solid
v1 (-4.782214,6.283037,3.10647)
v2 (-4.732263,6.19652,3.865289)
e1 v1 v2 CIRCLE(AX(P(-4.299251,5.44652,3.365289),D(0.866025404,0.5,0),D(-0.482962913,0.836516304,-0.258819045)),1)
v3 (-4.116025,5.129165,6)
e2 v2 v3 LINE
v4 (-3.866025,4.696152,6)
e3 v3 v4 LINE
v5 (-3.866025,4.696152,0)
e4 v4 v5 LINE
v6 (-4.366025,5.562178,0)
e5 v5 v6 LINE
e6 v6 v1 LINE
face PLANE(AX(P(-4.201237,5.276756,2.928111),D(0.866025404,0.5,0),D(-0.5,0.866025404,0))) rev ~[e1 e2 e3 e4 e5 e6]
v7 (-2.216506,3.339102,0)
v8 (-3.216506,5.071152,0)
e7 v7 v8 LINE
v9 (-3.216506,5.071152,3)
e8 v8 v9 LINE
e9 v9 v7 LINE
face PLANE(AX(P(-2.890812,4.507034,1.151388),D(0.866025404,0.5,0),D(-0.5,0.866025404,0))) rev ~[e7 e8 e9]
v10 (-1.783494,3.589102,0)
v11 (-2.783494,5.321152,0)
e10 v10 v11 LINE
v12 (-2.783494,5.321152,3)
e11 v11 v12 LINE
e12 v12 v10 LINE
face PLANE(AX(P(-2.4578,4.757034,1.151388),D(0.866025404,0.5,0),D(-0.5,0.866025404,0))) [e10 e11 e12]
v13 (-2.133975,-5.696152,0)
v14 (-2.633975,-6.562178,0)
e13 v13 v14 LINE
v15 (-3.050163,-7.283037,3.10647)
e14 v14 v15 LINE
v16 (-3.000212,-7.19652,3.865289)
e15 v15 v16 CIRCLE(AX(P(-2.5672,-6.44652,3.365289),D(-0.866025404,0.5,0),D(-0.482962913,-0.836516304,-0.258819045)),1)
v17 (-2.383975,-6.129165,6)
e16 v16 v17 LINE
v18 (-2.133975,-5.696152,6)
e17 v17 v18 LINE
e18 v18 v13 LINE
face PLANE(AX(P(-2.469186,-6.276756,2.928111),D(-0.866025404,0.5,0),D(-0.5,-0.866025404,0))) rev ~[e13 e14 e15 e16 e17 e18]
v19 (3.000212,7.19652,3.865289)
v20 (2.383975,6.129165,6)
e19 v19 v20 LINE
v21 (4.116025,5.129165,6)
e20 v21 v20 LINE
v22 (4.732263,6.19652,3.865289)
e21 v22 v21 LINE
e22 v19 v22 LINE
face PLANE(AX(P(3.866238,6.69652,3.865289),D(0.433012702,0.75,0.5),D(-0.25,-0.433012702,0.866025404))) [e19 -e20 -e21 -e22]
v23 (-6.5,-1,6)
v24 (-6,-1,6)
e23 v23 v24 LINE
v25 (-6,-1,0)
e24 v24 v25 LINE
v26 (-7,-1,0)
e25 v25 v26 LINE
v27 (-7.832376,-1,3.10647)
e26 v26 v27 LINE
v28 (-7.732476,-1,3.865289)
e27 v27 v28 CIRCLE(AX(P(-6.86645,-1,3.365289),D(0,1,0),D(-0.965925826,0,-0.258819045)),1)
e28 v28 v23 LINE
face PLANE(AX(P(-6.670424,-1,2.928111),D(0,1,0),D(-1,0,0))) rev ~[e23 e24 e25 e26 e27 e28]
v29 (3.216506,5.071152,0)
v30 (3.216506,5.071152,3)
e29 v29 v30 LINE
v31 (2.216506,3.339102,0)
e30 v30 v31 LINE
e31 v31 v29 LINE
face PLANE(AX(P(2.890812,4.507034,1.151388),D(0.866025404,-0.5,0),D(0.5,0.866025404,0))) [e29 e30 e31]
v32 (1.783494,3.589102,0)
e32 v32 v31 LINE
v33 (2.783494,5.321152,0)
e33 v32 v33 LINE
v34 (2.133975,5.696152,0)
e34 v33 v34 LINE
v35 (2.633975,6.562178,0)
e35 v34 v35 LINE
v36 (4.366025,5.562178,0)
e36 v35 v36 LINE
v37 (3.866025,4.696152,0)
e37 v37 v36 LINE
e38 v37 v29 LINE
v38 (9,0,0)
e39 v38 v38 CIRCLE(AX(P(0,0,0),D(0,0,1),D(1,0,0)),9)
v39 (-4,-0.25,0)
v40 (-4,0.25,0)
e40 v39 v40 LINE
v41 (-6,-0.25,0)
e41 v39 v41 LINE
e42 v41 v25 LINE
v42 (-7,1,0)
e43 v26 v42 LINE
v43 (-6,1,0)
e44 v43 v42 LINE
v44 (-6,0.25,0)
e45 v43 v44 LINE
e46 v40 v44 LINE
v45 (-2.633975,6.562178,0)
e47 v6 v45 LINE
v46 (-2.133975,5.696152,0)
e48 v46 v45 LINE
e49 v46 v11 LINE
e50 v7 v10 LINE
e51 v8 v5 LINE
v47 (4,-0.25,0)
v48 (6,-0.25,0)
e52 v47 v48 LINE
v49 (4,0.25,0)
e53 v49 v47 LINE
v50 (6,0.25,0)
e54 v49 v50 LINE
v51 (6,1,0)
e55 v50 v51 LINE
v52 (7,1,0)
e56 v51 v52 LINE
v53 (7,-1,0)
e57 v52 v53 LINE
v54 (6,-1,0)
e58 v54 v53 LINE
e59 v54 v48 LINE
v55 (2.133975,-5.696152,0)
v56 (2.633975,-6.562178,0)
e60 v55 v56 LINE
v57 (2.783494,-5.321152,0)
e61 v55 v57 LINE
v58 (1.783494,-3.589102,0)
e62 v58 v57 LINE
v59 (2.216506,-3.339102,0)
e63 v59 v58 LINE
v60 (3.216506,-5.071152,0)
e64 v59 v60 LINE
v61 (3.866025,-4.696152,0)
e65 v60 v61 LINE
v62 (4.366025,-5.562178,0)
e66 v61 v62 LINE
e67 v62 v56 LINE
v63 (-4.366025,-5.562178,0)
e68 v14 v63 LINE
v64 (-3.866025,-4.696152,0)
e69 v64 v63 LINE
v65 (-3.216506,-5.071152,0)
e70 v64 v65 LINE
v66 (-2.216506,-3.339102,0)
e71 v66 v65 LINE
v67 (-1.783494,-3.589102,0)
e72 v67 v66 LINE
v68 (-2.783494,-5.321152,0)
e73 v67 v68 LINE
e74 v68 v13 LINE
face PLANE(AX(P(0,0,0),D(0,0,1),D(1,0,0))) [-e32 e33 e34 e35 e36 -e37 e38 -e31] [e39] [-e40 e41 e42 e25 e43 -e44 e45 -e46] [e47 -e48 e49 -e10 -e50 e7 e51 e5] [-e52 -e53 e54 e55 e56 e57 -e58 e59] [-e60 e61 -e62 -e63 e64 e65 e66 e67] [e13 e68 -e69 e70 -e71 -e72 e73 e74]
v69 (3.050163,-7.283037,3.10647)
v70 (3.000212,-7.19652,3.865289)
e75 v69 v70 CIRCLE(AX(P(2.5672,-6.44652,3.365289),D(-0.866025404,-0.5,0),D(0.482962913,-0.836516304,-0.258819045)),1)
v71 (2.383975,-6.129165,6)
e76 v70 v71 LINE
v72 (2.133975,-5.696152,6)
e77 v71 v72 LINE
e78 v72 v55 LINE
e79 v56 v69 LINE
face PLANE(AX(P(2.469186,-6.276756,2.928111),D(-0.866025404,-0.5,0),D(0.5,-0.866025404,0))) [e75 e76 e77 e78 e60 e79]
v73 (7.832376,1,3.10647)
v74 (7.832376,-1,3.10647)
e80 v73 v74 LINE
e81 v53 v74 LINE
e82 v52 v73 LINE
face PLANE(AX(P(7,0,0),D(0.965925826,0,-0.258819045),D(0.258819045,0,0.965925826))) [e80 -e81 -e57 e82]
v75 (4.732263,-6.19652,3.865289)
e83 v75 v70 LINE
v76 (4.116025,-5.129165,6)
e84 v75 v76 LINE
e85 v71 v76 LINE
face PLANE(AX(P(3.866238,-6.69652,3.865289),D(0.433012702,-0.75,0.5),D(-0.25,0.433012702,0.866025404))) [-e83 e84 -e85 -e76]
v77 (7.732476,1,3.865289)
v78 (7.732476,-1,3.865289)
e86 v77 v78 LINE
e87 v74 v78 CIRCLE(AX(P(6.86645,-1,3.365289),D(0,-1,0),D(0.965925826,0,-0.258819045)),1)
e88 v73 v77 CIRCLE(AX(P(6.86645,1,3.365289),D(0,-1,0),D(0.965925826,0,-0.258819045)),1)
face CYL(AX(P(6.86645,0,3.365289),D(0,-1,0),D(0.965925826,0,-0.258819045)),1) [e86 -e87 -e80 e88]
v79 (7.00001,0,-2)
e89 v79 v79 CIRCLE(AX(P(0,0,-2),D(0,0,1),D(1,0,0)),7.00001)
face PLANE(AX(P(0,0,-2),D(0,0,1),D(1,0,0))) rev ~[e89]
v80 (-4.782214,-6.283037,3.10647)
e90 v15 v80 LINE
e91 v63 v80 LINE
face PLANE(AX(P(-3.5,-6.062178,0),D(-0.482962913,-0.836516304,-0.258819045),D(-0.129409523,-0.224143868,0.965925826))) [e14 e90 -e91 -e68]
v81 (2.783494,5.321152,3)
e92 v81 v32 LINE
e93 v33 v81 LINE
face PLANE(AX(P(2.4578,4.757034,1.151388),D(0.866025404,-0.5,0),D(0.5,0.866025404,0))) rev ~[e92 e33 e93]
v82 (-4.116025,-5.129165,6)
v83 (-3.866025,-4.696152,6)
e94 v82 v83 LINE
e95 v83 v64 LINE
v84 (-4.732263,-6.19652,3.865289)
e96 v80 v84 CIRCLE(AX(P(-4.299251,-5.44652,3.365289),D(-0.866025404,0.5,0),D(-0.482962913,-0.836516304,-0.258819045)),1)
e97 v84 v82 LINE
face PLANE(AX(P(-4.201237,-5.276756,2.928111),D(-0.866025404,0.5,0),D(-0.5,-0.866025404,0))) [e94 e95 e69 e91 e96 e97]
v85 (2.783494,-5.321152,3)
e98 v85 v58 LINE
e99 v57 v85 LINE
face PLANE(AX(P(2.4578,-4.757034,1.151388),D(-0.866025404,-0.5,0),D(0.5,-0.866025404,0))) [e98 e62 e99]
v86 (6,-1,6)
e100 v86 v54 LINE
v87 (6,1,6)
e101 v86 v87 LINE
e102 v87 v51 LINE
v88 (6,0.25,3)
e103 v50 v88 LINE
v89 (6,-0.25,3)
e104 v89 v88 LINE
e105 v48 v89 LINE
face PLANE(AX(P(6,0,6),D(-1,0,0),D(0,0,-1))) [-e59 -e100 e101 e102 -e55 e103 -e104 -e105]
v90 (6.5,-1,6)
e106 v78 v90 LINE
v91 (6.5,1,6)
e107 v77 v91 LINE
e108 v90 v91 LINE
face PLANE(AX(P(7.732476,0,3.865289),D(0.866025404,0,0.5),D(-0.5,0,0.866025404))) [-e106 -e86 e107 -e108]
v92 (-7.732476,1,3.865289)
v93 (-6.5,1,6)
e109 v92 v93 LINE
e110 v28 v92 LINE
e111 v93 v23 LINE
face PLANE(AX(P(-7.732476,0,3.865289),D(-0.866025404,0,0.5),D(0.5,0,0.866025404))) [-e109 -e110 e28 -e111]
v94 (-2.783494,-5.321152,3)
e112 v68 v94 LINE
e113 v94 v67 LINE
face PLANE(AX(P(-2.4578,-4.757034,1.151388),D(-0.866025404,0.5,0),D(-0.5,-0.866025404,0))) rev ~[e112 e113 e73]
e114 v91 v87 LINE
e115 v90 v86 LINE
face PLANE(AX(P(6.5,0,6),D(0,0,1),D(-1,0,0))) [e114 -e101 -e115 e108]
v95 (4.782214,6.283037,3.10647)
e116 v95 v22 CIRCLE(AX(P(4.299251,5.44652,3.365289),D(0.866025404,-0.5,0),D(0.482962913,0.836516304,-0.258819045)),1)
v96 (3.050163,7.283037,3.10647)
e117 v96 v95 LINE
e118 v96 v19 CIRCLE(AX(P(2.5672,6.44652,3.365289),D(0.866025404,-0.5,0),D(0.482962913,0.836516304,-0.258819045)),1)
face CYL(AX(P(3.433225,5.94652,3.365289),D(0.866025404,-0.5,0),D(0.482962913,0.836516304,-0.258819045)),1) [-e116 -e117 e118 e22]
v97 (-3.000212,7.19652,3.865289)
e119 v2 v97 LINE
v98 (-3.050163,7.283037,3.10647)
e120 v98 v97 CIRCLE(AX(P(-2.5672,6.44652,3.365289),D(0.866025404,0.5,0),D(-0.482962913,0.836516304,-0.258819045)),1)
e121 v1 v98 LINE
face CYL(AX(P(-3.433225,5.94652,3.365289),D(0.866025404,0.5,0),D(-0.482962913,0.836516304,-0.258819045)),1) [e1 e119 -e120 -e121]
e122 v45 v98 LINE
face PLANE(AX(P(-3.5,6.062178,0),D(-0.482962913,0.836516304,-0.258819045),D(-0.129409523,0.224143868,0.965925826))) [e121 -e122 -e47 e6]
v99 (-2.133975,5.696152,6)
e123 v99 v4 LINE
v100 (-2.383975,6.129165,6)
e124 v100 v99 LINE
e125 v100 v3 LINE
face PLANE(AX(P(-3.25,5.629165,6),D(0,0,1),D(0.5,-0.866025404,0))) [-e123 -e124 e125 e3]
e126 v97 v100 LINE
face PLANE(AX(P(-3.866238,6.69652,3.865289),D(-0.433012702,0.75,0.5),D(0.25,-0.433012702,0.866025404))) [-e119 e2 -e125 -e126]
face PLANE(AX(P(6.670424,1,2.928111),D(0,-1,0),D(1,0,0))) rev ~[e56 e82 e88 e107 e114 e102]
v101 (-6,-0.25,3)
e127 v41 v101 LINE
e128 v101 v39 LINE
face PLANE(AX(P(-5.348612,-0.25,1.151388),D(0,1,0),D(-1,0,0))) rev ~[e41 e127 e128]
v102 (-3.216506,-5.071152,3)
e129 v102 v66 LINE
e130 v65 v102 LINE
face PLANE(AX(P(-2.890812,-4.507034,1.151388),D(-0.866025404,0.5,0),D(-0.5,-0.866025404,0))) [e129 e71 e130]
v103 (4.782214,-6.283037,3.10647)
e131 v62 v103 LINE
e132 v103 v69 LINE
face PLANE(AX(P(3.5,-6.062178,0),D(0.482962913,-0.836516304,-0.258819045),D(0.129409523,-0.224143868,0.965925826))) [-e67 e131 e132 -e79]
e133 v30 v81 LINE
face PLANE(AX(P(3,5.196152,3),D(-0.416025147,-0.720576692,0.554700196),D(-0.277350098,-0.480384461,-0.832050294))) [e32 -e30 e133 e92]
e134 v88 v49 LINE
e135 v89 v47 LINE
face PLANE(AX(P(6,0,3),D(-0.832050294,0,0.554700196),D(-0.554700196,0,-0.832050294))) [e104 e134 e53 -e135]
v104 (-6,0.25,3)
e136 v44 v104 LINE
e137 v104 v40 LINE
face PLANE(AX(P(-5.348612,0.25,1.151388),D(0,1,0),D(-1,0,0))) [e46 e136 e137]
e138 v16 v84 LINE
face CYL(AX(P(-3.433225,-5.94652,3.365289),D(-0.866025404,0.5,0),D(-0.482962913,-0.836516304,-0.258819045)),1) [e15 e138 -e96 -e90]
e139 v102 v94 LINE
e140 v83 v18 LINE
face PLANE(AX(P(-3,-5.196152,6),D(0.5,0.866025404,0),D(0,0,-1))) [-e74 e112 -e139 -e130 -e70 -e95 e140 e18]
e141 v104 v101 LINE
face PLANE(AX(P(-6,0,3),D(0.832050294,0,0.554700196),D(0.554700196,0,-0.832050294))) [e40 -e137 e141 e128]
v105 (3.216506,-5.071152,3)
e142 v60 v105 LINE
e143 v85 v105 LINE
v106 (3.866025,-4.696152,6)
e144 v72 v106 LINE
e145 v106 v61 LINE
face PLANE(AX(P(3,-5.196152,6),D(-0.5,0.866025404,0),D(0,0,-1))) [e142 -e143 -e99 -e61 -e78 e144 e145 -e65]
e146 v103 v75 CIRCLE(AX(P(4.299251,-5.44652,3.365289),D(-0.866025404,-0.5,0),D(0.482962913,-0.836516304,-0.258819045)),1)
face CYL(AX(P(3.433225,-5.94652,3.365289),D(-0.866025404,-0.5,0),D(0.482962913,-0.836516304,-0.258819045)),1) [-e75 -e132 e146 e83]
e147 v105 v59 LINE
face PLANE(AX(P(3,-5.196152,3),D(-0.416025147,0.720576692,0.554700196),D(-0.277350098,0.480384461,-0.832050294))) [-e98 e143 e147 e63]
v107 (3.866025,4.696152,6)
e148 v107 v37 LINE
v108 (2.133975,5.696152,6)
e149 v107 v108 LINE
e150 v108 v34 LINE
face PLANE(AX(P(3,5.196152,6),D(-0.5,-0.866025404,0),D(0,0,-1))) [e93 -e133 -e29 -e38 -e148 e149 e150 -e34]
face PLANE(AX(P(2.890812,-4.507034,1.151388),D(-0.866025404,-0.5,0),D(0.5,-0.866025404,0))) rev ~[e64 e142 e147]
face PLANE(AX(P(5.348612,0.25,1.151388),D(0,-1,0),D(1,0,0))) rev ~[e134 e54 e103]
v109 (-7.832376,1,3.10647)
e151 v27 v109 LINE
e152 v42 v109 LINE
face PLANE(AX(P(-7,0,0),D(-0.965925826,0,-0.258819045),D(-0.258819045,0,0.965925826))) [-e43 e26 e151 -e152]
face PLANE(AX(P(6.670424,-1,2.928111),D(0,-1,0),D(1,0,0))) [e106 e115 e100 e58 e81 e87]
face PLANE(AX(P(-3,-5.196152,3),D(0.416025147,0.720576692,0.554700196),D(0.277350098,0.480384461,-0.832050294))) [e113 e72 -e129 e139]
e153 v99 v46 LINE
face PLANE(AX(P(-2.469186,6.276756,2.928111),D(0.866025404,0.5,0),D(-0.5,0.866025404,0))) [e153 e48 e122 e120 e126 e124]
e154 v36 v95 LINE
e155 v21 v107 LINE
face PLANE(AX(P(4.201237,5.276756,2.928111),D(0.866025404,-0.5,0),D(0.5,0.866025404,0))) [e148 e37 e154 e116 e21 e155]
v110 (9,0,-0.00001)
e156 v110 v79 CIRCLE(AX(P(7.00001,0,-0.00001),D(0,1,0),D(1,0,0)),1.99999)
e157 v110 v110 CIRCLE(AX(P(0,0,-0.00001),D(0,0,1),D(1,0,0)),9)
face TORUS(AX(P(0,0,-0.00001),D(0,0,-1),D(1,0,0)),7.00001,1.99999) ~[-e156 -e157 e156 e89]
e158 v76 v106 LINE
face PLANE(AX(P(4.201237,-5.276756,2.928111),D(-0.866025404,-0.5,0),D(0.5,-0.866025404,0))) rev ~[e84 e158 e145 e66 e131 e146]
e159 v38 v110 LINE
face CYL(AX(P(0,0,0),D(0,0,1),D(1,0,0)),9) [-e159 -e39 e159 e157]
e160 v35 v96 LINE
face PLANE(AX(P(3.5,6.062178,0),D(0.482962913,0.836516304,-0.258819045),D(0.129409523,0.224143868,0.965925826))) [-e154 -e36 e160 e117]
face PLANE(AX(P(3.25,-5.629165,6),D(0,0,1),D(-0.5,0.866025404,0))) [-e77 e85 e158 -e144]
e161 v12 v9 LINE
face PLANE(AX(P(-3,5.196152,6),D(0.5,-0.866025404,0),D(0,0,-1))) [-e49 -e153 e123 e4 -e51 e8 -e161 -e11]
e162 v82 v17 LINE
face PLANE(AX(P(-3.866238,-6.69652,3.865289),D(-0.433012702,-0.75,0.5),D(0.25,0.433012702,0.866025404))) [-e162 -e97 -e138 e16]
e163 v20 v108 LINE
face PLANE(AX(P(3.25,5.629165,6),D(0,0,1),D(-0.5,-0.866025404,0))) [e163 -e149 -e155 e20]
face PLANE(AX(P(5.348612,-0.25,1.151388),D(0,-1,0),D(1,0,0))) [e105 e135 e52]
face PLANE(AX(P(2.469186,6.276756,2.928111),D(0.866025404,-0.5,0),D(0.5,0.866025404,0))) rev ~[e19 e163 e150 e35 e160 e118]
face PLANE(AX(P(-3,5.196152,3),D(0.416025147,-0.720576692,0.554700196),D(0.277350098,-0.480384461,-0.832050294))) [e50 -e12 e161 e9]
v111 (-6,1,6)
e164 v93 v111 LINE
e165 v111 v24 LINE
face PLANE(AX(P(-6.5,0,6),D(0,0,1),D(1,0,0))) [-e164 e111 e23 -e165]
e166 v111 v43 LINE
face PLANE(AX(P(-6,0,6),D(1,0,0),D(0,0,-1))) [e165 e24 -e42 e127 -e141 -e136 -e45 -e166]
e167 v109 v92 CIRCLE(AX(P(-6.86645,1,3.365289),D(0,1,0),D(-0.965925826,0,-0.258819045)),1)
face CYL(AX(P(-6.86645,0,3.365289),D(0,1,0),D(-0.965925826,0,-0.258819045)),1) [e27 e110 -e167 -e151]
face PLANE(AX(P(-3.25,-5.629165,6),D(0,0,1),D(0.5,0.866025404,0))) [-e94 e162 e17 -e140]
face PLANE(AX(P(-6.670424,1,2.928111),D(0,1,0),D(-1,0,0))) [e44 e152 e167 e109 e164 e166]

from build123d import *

# Parameters (mm, degrees)
F1_DEPTH        = 1
F1_COPIES_COUNT = 6
F2_DEPTH        = 0.25
F2_COPIES_COUNT = 6
F3_R            = 9
F4_DEPTH        = 2
F5_R            = 1.99999


# Not quite as in the source:
# - a fillet or chamfer is up to 0.001 mm smaller than in the source, because OpenCascade refuses the exact size
# - a pattern or mirror of a feature is missing from the dataset's text; its kind, count and spacing are read off the source's solid


with BuildPart() as f1:
    # F0 (on Front) → F1 (new body, symmetric)
    with BuildSketch(Plane.XZ):
        with BuildLine():
            Line((6, 3), (6, 0))
            Line((6, 0), (7, 0))
            Line((7, 0), (7.8323762036, 3.1064702829))
            ThreePointArc((7.8323762036, 3.1064702829), (7.8578952387, 3.4958155202), (7.7324757811, 3.865289328))
            Line((7.7324757811, 3.865289328), (6.5, 6))
            Line((6.5, 6), (6, 6))
            Line((6, 6), (6, 3))
        make_face()
    extrude(amount=F1_DEPTH, both=True)


with BuildPart() as f1_copies_1:
    # F1_copies: instance of F1
    add(f1.part.rotate(Axis((0, 0, 0), (0, 0, 1)), 1 * 360 / F1_COPIES_COUNT))


with BuildPart() as f1_copies_2:
    # F1_copies: instance of F1
    add(f1.part.rotate(Axis((0, 0, 0), (0, 0, 1)), 2 * 360 / F1_COPIES_COUNT))


with BuildPart() as f1_copies_3:
    # F1_copies: instance of F1
    add(f1.part.rotate(Axis((0, 0, 0), (0, 0, 1)), 3 * 360 / F1_COPIES_COUNT))


with BuildPart() as f1_copies_4:
    # F1_copies: instance of F1
    add(f1.part.rotate(Axis((0, 0, 0), (0, 0, 1)), 4 * 360 / F1_COPIES_COUNT))


with BuildPart() as f1_copies_5:
    # F1_copies: instance of F1
    add(f1.part.rotate(Axis((0, 0, 0), (0, 0, 1)), 5 * 360 / F1_COPIES_COUNT))


with BuildPart() as f1_1:
    add(f1.part)

    # F0 (on Front) → F2 (join, symmetric)
    with BuildSketch(Plane.XZ):
        Polygon((6, 3), (4, 0), (6, 0), align=None)
    f2 = extrude(amount=F2_DEPTH, both=True)

    # F2_copies: F2 ×6 about axis
    f2_copies_axis = Axis((0, 0, 0), (0, 0, 1))
    for i in range(1, F2_COPIES_COUNT):
        add(f2.rotate(f2_copies_axis, i * 360 / F2_COPIES_COUNT))

    add(f1_copies_1.part)  # F4 merges F1_copies_1

    add(f1_copies_2.part)  # F4 merges F1_copies_2

    add(f1_copies_3.part)  # F4 merges F1_copies_3

    add(f1_copies_4.part)  # F4 merges F1_copies_4

    add(f1_copies_5.part)  # F4 merges F1_copies_5
    # F3 (on Top) → F4 (join)
    with BuildSketch(Plane.XY):
        Circle(F3_R)
    extrude(amount=-F4_DEPTH)

    # F5 (radius 2 in the source; OpenCascade refuses exactly that, so slightly less here)
    f5_edges = [f1_1.edges().sort_by_distance(p)[0] for p in [
        (-9, 0, -2),
    ]]
    fillet(f5_edges, radius=F5_R)


solid = f1_1.part
